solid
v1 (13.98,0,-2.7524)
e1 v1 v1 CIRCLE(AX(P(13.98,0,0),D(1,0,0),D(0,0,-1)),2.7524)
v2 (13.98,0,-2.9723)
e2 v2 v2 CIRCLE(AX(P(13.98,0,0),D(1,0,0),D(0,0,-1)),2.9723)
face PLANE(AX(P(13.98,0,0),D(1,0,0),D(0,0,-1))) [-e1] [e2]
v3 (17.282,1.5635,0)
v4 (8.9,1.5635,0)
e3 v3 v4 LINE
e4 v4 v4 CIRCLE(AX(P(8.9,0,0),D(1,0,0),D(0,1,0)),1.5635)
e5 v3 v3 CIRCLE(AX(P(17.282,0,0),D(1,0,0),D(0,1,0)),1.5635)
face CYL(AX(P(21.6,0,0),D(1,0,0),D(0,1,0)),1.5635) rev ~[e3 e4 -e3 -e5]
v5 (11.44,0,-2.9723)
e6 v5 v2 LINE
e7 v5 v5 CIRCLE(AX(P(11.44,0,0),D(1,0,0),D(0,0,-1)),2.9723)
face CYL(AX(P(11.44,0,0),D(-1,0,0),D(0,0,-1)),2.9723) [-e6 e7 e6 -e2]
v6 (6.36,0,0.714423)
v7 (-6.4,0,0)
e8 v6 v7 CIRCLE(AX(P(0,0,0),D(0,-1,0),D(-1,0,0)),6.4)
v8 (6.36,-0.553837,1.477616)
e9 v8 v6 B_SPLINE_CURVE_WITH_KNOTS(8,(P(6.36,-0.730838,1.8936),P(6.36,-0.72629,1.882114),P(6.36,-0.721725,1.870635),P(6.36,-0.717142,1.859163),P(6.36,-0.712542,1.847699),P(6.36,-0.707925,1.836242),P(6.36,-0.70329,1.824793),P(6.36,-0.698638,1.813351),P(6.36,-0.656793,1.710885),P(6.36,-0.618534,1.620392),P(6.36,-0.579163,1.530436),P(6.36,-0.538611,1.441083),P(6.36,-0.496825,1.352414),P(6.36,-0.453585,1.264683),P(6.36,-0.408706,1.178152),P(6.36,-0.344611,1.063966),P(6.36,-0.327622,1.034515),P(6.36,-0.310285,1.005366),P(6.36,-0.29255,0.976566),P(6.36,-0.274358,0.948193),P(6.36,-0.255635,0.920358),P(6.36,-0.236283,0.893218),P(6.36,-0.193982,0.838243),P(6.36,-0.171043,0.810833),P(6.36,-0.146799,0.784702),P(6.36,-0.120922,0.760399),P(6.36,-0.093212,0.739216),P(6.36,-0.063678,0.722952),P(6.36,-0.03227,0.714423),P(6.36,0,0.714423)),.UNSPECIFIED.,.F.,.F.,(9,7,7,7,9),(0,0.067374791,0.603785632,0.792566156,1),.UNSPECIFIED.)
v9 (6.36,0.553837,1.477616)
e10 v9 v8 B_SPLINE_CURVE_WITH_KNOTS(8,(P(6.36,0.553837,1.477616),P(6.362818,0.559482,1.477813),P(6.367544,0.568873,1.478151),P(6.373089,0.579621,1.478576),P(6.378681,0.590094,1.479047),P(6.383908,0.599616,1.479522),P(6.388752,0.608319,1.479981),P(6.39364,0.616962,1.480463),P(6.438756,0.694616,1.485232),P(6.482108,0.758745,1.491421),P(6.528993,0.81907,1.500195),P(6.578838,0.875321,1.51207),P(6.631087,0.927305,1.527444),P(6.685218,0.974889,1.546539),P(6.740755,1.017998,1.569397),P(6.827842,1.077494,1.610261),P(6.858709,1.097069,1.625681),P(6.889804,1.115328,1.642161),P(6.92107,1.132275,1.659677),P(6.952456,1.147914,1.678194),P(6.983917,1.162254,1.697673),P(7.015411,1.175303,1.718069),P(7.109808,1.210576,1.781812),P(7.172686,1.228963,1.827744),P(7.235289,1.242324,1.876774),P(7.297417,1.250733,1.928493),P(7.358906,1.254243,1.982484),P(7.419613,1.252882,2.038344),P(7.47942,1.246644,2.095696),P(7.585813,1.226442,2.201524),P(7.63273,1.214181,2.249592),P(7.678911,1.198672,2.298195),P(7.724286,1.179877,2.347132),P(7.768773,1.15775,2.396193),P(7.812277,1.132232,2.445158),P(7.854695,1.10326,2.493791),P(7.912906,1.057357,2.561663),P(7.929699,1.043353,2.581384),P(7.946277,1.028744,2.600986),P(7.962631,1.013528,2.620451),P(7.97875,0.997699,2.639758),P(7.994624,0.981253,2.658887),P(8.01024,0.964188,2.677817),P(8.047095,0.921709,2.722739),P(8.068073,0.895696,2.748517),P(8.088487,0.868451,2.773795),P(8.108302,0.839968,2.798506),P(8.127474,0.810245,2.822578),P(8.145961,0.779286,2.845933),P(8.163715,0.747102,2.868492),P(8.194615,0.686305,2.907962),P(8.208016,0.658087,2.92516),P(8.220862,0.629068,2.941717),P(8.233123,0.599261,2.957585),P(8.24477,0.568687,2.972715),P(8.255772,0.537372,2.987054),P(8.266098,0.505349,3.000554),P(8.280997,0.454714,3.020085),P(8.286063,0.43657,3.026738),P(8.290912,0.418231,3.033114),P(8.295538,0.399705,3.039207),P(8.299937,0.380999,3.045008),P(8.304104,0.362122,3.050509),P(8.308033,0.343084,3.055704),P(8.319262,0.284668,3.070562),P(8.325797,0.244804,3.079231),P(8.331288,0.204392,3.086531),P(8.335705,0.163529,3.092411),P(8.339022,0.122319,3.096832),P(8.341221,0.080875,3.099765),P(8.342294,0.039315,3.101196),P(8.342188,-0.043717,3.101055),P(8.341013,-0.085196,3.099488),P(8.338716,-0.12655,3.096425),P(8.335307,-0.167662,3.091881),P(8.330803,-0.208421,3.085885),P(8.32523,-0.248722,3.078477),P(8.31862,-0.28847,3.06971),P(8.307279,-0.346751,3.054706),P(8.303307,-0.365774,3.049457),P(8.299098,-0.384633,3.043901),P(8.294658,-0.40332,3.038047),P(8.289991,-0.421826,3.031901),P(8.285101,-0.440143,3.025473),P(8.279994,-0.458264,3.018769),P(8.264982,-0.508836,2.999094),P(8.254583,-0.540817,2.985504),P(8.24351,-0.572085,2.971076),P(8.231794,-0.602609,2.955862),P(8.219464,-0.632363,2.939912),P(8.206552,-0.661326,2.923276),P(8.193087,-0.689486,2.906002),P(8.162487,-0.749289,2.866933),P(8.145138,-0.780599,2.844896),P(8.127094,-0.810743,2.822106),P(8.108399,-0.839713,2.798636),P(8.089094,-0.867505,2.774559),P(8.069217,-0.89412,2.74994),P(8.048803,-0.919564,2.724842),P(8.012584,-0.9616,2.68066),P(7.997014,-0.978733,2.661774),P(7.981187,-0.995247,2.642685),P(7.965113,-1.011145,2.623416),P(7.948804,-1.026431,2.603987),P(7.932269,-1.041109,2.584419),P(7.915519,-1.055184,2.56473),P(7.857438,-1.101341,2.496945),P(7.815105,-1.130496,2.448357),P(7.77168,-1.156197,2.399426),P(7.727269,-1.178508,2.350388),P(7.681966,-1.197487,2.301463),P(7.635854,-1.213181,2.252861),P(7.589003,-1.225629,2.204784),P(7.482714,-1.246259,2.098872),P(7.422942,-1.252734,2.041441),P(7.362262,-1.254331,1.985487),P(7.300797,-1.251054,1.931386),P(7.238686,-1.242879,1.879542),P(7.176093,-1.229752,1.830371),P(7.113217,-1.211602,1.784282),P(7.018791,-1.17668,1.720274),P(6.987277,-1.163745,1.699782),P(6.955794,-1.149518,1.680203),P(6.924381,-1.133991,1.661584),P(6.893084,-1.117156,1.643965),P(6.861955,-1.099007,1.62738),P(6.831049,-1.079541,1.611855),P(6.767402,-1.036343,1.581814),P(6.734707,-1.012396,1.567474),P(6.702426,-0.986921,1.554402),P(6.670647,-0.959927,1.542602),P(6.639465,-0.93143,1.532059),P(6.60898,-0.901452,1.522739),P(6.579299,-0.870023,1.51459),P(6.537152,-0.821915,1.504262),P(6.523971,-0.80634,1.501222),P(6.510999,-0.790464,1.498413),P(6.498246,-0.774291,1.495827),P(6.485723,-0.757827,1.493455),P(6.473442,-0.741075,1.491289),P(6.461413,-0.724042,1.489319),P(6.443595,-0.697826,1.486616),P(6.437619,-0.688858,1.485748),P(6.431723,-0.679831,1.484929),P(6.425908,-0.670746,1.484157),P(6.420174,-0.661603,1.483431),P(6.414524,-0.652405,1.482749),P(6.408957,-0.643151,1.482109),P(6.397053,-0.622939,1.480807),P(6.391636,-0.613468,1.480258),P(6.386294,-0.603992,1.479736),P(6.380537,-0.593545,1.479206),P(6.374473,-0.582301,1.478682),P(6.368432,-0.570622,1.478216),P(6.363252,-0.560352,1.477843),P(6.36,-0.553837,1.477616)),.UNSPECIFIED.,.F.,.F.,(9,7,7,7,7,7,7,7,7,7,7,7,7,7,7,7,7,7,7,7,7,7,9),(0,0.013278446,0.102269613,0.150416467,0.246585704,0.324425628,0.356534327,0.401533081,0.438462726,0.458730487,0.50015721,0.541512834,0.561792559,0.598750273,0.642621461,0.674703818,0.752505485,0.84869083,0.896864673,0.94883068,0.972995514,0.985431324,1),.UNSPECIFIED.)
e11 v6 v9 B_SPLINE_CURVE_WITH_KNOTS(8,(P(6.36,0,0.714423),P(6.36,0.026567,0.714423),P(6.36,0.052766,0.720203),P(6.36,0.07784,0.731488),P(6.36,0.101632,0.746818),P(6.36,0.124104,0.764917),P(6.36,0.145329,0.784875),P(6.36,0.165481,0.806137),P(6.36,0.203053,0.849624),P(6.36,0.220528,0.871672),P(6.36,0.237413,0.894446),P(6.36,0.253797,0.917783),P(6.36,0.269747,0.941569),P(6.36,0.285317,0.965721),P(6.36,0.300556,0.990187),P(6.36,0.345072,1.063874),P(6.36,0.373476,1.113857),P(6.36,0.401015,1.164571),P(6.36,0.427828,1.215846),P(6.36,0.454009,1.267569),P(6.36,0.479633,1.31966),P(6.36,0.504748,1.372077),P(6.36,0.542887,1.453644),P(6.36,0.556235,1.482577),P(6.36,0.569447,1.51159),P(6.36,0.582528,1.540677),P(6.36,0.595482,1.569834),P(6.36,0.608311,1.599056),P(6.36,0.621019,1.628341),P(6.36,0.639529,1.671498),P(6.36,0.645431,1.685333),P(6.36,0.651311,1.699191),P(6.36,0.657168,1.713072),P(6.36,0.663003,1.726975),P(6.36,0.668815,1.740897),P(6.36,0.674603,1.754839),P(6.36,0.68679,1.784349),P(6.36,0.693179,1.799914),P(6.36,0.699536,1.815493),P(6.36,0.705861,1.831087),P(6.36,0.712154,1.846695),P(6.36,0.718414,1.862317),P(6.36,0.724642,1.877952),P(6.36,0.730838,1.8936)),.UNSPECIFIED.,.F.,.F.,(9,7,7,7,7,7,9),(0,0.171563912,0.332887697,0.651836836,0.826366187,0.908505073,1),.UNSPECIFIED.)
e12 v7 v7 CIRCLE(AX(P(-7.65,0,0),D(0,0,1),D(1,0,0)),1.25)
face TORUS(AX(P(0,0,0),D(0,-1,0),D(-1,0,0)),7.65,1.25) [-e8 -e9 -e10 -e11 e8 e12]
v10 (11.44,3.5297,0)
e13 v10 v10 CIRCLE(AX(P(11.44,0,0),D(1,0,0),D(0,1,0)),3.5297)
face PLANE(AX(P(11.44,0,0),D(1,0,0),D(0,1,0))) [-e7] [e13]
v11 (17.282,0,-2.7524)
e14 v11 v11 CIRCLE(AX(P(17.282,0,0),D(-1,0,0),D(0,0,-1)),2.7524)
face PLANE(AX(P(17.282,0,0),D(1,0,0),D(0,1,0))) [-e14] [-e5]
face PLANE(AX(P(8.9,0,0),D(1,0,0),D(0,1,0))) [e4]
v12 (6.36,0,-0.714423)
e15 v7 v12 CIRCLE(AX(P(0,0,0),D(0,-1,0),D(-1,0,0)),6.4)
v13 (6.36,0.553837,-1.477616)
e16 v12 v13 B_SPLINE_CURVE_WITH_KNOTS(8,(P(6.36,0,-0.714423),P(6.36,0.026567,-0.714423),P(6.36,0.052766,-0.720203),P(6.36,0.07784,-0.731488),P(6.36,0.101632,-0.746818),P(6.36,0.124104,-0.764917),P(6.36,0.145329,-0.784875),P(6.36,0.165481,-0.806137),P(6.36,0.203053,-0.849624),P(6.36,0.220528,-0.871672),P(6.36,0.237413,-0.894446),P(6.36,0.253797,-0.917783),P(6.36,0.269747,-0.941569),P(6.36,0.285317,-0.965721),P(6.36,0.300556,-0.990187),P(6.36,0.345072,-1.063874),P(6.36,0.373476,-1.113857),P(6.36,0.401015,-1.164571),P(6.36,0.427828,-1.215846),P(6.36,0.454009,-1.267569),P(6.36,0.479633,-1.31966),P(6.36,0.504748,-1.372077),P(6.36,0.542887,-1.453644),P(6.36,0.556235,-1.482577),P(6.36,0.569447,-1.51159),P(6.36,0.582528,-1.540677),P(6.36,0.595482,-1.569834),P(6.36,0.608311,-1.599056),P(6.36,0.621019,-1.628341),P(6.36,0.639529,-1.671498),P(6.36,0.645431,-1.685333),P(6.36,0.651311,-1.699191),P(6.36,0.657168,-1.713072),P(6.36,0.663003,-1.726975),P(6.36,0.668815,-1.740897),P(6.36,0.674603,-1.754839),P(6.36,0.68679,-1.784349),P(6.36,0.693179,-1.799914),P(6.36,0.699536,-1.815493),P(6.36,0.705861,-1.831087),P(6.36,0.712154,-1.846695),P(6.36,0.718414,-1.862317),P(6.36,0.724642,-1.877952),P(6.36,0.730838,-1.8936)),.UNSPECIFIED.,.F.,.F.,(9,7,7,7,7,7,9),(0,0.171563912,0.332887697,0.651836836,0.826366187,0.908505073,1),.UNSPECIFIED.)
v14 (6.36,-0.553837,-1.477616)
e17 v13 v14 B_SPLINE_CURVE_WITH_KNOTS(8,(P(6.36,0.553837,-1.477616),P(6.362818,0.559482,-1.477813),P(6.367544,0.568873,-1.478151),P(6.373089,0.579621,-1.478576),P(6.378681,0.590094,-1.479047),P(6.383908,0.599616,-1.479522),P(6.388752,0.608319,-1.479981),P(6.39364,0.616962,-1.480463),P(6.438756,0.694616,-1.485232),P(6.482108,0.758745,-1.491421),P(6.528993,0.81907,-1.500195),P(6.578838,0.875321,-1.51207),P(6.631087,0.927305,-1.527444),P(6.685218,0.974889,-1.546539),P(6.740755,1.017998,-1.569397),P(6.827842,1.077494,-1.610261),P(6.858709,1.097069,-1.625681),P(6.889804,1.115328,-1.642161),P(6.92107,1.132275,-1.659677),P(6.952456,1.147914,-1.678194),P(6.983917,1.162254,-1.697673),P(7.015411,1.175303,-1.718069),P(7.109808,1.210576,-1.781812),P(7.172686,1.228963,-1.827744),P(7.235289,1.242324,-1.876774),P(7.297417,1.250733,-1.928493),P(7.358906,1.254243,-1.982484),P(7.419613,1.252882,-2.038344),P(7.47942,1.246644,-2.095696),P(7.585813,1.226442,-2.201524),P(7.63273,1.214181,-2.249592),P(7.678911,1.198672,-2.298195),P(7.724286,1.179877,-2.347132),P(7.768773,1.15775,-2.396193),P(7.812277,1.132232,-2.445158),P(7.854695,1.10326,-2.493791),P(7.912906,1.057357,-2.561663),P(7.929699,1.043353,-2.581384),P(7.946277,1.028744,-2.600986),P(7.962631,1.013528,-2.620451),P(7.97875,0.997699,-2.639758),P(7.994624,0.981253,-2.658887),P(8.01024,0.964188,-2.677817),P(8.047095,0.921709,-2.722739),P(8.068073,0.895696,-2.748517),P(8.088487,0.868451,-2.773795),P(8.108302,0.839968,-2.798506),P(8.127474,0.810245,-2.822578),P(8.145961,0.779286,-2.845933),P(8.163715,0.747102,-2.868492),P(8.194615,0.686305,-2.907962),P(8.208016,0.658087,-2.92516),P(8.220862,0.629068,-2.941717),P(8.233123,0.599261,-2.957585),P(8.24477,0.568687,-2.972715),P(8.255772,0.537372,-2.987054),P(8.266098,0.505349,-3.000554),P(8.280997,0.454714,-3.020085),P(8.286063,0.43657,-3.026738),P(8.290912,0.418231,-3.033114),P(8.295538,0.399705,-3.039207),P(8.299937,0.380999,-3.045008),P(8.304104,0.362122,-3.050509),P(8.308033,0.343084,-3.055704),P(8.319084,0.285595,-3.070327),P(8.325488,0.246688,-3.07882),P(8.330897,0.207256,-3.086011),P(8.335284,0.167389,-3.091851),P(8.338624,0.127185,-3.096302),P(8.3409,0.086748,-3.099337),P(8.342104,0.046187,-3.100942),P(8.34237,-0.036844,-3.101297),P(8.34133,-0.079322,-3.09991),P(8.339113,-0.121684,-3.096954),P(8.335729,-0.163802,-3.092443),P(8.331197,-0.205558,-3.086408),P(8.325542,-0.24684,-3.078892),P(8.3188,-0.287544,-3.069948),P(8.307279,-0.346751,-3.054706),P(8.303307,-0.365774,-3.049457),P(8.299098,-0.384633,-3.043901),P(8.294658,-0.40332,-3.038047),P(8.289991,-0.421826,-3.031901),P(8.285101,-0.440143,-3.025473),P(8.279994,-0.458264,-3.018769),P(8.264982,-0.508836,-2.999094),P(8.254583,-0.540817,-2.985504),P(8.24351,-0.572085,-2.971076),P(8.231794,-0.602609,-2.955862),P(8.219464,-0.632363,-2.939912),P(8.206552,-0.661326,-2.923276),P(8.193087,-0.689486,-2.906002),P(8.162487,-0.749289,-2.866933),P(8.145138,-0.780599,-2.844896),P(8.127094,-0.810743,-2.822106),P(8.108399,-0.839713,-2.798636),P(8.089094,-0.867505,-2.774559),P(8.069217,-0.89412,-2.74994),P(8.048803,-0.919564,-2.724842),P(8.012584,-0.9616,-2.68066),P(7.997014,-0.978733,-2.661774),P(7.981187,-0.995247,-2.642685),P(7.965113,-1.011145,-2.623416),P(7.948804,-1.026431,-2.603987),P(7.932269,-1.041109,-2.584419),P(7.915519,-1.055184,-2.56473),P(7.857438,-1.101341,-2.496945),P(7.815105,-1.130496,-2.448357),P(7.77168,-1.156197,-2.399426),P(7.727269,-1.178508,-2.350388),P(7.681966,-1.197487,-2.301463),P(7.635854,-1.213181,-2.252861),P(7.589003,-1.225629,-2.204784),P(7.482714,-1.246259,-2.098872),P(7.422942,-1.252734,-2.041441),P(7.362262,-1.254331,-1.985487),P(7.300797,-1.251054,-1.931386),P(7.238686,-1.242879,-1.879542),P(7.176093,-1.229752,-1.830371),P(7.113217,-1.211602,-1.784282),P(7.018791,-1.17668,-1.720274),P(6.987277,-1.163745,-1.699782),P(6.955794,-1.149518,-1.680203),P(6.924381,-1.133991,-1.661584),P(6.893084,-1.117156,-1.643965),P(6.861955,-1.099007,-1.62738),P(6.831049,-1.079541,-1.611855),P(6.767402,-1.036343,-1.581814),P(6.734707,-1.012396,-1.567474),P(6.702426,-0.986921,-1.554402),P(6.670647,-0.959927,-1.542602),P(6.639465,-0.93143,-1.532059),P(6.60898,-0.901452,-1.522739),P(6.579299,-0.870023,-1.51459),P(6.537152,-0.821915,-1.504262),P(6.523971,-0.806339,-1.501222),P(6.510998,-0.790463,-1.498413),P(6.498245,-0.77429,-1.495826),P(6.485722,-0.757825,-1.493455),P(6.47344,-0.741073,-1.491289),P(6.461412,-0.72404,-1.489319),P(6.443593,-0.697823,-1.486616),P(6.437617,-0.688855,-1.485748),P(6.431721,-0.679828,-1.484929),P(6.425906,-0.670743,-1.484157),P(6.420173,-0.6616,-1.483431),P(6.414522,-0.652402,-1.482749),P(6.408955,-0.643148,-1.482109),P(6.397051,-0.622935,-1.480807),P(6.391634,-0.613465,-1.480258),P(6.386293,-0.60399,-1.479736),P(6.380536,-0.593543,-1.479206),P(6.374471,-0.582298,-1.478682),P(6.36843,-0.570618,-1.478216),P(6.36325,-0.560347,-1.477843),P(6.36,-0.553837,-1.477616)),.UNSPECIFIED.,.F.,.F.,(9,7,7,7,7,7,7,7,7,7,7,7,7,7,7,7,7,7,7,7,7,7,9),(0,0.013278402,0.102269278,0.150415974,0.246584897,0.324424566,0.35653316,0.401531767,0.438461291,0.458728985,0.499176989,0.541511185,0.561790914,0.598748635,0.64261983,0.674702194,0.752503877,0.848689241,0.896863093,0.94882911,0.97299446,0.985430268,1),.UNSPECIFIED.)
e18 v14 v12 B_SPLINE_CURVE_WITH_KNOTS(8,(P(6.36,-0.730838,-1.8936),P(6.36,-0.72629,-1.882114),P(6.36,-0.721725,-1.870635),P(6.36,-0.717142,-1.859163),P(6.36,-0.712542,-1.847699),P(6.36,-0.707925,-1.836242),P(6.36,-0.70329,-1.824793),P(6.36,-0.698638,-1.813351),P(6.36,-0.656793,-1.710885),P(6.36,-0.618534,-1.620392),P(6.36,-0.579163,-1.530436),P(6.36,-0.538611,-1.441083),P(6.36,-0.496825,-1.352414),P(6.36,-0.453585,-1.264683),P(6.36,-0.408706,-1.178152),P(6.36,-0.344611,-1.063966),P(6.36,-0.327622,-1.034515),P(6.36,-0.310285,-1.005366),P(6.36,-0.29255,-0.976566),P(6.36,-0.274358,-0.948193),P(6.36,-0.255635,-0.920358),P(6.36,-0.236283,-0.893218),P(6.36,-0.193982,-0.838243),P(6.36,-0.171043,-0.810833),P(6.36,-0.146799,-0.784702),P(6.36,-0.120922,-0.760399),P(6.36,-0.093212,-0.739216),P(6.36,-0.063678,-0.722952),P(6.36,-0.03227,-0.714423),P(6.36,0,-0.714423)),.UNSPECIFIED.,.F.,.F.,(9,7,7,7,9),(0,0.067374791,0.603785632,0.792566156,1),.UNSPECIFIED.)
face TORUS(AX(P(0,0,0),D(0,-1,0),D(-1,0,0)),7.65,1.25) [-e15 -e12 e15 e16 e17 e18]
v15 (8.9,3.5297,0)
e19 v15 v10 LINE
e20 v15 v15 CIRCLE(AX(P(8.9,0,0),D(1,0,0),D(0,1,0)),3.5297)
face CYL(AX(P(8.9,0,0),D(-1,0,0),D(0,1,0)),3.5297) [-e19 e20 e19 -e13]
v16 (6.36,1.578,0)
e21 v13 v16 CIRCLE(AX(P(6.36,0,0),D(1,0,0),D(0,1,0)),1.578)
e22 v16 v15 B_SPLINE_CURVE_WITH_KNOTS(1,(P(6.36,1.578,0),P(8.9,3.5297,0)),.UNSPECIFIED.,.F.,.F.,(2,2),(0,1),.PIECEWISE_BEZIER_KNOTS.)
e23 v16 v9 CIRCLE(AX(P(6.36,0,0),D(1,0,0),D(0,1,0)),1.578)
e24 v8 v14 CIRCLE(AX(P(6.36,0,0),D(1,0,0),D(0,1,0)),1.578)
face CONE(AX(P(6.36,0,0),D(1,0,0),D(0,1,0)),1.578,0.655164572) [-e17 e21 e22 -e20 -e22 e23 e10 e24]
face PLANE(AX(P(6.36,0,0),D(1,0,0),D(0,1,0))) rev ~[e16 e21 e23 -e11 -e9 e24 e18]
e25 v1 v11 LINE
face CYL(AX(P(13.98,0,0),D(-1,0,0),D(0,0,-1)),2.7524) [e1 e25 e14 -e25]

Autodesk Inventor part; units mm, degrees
ref_plane "XZ Plane" through (0, 0, 0) normal (0, 1, 0) x (-1, 0, 0)
ref_plane "XY Plane" through (0, 0, 0) normal (0, 0, 1) x (1, 0, 0)
sketch "Sketch1" plane through (0, 0, 0) normal (0, 0, 1) x (1, 0, 0)
  circle A0 centre (-7.65, 0) radius 1.25
  line L0 (0, 4.1624) -> (0, -4.1624)
  point P0 (0, 0)
  dimension "d0" = 2.5
revolve "Revolution1" add sketch "Sketch1" angle 360 about axis through (0, 4.1624, 0) along (0, -1, 0)
ref_plane "Work Plane1" through (21.6, 0, 0) normal (1, 0, 0) x (0, 1, 0)
sketch "Sketch2" plane through (21.6, 0, 0) normal (1, 0, 0) x (0, 1, 0)
  circle A0 centre (0, 0) radius 1.5
  circle A1 centre (0, 0) radius 2.5
  dimension "d3" = 3
  dimension "d4" = 5
ref_plane "Work Plane2" through (8.9, 0, 0) normal (1, 0, 0) x (0, 1, 0)
sketch "Sketch3" plane through (8.9, 0, 0) normal (1, 0, 0) x (0, 1, 0)
  circle A0 centre (0, 0) radius 3.5297
  circle A1 centre (0, 0) radius 1.487
extrude "Extrusion1" add sketch "Sketch3" along normal blind 2.54
extrude "Extrusion2" add sketch "Sketch2" against normal blind 2.54
sketch "Sketch5" plane through (11.44, 0, 0) normal (1, 0, 0) x (0, 0, -1)
  circle A0 centre (0, 0) radius 1.5
  circle A1 centre (0, 0) radius 2.9723
sketch "Sketch6" plane through (19.06, 0, 0) normal (-1, 0, 0) x (0, 0, 1)
  circle A0 centre (0, 0) radius 2.5 projected
  circle A1 centre (0, 0) radius 1.5
  circle A2 centre (0, 0) radius 2.5
sketch "Sketch7" plane through (0, 0, 0) normal (0, 1, 0) x (-1, 0, 0)
  point P0 (0, 0)
extrude "Extrusion3" add sketch "Sketch5" along normal blind 2.54
sketch "Sketch8" plane through (13.98, 0, 0) normal (1, 0, 0) x (0, 0, -1)
  circle A0 centre (0, 0) radius 1.487
  circle A1 centre (0, 0) radius 2.7524
extrude "Extrusion4" add sketch "Sketch8" along normal blind 5.588
sketch "Sketch9" plane through (8.9, 0, 0) normal (1, 0, 0) x (0, 1, 0)
  circle A0 centre (0, 0) radius 3.5297
ref_plane "Work Plane3" through (6.36, 0, 0) normal (1, 0, 0) x (0, 1, 0)
sketch "Sketch10" plane through (6.36, 0, 0) normal (1, 0, 0) x (0, 1, 0)
  circle A0 centre (0, 0) radius 1.578
loft "Loft1" add profiles "Sketch10" section 2 edges at (8.9, -3.5297, 0)
sketch "Sketch11" plane through (21.6, 0, 0) normal (1, 0, 0) x (0, 1, 0)
  circle A0 centre (0, 0) radius 1.5635
extrude "Extrusion5" cut sketch "Sketch11" against normal blind 12.7
sketch "Sketch12" plane through (21.6, 0, 0) normal (1, 0, 0) x (0, 1, 0)
  circle A0 centre (0, 0) radius 1.5635
  circle A1 centre (0, 0) radius 3.9487
extrude "Extrusion6" cut sketch "Sketch12" against normal blind 4.318
properties part number "kims_perch2020"
